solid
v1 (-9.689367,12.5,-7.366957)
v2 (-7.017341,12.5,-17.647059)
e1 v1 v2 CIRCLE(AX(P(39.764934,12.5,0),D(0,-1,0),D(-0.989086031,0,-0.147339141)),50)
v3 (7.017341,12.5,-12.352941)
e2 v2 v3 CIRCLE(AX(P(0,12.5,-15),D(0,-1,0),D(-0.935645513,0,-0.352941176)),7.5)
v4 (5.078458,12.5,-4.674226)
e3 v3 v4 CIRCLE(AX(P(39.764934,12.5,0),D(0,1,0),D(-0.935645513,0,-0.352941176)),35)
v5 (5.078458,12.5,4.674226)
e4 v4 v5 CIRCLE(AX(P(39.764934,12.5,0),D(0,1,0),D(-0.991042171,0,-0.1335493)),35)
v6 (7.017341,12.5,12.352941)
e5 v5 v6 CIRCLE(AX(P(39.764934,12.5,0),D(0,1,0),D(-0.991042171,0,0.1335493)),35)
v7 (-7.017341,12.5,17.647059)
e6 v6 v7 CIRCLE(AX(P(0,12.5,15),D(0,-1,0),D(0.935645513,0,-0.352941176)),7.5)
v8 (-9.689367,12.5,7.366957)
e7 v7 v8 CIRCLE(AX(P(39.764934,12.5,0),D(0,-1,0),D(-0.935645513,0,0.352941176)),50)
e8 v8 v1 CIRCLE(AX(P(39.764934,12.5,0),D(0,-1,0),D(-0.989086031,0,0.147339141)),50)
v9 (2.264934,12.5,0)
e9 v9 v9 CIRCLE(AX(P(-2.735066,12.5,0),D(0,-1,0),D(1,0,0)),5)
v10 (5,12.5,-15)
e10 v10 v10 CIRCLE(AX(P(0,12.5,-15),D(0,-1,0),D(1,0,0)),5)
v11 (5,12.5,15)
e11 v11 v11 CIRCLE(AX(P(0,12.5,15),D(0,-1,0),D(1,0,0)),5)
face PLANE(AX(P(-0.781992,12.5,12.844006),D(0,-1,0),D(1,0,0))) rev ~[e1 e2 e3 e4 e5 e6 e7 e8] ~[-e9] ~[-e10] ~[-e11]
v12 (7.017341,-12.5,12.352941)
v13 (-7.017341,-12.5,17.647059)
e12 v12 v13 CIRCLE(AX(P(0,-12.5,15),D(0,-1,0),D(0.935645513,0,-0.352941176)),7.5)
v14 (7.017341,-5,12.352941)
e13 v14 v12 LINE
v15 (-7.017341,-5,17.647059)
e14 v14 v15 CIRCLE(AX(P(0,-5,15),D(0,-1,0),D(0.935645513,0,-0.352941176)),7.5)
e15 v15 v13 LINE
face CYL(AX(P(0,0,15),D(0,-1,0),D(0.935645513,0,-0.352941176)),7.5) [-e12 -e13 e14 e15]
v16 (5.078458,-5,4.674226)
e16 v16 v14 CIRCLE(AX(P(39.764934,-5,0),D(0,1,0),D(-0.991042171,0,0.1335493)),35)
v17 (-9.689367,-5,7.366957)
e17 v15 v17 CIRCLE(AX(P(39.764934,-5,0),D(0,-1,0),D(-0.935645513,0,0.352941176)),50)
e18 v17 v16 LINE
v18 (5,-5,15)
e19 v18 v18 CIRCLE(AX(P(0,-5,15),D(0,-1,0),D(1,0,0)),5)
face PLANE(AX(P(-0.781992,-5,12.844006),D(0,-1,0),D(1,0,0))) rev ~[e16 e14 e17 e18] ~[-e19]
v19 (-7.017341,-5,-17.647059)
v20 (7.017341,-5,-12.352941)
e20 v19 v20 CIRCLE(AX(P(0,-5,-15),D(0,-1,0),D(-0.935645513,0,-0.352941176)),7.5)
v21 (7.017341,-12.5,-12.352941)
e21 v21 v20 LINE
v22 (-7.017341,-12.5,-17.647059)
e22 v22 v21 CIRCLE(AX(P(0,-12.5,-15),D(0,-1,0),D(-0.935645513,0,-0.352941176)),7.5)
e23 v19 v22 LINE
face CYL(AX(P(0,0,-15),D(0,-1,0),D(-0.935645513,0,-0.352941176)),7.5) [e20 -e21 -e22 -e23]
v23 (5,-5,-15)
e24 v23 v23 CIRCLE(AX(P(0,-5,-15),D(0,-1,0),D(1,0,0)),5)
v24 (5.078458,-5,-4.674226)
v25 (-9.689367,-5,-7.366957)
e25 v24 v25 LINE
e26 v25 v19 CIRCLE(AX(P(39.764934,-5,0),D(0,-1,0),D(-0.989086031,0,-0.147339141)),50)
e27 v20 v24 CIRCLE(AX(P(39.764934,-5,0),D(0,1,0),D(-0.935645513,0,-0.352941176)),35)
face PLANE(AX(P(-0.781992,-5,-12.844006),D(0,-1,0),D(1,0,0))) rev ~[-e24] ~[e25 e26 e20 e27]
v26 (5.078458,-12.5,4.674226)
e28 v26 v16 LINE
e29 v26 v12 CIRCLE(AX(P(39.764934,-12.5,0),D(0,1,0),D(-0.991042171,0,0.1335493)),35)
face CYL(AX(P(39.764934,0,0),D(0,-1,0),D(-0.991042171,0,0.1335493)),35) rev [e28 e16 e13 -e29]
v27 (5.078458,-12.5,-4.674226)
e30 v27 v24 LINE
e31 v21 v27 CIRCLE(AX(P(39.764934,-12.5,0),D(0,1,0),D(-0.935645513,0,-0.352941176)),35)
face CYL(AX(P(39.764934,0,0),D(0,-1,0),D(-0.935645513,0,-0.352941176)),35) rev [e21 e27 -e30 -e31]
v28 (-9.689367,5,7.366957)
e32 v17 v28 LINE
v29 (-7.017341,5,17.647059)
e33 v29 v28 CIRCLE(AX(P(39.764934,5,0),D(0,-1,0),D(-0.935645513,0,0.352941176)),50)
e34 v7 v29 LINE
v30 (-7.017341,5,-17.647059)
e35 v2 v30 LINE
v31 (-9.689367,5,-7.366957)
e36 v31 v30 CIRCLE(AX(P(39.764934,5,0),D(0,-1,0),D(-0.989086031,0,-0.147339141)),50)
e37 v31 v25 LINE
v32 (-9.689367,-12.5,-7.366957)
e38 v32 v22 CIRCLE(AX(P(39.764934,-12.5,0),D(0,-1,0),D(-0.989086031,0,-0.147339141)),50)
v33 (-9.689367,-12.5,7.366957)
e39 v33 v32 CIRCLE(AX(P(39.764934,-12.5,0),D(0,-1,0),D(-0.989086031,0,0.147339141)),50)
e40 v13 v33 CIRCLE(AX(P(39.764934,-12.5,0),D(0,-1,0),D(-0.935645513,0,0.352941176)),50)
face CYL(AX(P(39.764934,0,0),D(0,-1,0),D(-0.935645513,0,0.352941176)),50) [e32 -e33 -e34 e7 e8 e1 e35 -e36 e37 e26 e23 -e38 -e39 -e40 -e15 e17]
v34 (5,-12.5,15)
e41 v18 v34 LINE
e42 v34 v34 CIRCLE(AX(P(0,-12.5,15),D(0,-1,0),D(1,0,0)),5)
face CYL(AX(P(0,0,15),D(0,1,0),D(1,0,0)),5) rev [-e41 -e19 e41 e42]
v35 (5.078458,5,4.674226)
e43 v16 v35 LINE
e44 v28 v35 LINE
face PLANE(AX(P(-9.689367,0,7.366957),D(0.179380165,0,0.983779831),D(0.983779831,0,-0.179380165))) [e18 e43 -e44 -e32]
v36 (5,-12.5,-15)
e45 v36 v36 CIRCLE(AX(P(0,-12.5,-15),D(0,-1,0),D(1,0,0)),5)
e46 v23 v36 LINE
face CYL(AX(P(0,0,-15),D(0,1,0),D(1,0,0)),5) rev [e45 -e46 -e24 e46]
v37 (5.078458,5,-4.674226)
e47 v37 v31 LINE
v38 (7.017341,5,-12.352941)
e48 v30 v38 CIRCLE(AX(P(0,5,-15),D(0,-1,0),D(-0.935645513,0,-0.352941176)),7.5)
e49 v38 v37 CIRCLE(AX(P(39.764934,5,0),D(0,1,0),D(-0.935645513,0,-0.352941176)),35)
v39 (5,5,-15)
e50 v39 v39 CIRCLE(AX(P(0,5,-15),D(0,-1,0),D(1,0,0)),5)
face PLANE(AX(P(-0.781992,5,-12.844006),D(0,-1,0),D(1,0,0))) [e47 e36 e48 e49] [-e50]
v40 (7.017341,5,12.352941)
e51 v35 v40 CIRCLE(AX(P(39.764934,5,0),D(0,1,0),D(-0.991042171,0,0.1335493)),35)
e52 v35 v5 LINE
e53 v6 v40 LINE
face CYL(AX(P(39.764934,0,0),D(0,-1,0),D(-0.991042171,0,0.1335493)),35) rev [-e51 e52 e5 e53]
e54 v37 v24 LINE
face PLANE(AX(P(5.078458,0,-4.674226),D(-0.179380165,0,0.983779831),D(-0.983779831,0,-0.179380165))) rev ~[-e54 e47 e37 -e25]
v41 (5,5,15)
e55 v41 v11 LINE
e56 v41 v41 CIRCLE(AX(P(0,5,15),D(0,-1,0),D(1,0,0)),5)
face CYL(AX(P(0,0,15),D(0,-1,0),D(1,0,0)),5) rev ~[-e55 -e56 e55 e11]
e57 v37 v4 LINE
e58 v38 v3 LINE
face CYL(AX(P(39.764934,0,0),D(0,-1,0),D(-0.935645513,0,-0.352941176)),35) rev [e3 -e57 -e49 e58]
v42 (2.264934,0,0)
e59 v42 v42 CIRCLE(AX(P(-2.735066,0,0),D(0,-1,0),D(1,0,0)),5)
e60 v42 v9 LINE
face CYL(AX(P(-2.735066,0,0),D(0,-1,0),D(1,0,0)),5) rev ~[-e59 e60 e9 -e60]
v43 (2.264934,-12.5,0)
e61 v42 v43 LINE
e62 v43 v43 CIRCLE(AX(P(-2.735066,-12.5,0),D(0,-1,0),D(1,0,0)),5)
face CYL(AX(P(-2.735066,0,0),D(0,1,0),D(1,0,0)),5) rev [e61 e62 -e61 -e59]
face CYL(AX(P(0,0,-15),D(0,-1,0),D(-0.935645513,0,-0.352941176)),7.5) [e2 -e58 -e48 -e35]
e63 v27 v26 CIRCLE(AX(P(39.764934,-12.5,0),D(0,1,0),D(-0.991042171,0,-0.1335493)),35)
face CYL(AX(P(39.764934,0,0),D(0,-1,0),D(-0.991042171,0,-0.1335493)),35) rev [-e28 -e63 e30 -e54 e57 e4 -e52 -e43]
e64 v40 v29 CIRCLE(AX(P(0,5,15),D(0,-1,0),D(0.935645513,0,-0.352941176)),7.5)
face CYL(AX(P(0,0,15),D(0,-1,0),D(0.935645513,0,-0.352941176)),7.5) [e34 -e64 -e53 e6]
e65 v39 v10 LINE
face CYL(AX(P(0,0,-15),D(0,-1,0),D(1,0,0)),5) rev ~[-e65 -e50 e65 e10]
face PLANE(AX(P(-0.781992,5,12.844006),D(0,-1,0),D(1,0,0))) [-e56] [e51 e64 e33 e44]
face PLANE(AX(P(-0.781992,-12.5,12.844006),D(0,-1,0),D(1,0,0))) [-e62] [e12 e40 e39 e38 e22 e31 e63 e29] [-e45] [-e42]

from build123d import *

# Parameters (mm, degrees)
F0_R     = 5
F1_DEPTH = 12.5
F2_DEPTH = 5


# Not quite as in the source:
# - a feature of the source that left no trace in its solid (it failed there, or was rolled back) is left out


with BuildPart() as f1:
    # F0 (on Front) → F1 (new body, symmetric)
    with BuildSketch(Plane.XZ):
        with BuildLine():
            ThreePointArc((5.0784583206, 4.6742255002), (5.8300100803, 8.5686007088), (7.0173413473, 12.3529411765))
            ThreePointArc((7.0173413473, 12.3529411765), (2.6470588235, 22.0173413473), (-7.0173413473, 17.6470588235))
            ThreePointArc((-7.0173413473, 17.6470588235), (-8.6271086588, 12.5781627487), (-9.6893672694, 7.3669570477))
            Line((-9.6893672694, 7.3669570477), (5.0784583206, 4.6742255002))
        make_face()
        with Locations((0, 15)):
            Circle(F0_R, mode=Mode.SUBTRACT)
        with BuildLine():
            ThreePointArc((5.0784583206, -4.6742255002), (4.7649343015, 0), (5.0784583206, 4.6742255002))
            Line((5.0784583206, 4.6742255002), (-9.6893672694, 7.3669570477))
            ThreePointArc((-9.6893672694, 7.3669570477), (-10.2350656985, 0), (-9.6893672694, -7.3669570477))
            Line((-9.6893672694, -7.3669570477), (5.0784583206, -4.6742255002))
        make_face()
        with Locations((-2.7350656985, 0)):
            Circle(F0_R, mode=Mode.SUBTRACT)
        with BuildLine():
            ThreePointArc((7.0173413473, -12.3529411765), (5.8300100803, -8.5686007088), (5.0784583206, -4.6742255002))
            Line((5.0784583206, -4.6742255002), (-9.6893672694, -7.3669570477))
            ThreePointArc((-9.6893672694, -7.3669570477), (-8.6271086588, -12.5781627487), (-7.0173413473, -17.6470588235))
            ThreePointArc((-7.0173413473, -17.6470588235), (2.6470588235, -22.0173413473), (7.0173413473, -12.3529411765))
        make_face()
        with Locations((0, -15)):
            Circle(F0_R, mode=Mode.SUBTRACT)
    extrude(amount=F1_DEPTH, both=True)

    # F0 (on Front) → F2 (cut, symmetric)
    with BuildSketch(Plane.XZ):
        with BuildLine():
            ThreePointArc((5.0784583206, 4.6742255002), (5.8300100803, 8.5686007088), (7.0173413473, 12.3529411765))
            ThreePointArc((7.0173413473, 12.3529411765), (2.6470588235, 22.0173413473), (-7.0173413473, 17.6470588235))
            ThreePointArc((-7.0173413473, 17.6470588235), (-8.6271086588, 12.5781627487), (-9.6893672694, 7.3669570477))
            Line((-9.6893672694, 7.3669570477), (5.0784583206, 4.6742255002))
        make_face()
        with Locations((0, 15)):
            Circle(F0_R, mode=Mode.SUBTRACT)
        with BuildLine():
            ThreePointArc((7.0173413473, -12.3529411765), (5.8300100803, -8.5686007088), (5.0784583206, -4.6742255002))
            Line((5.0784583206, -4.6742255002), (-9.6893672694, -7.3669570477))
            ThreePointArc((-9.6893672694, -7.3669570477), (-8.6271086588, -12.5781627487), (-7.0173413473, -17.6470588235))
            ThreePointArc((-7.0173413473, -17.6470588235), (2.6470588235, -22.0173413473), (7.0173413473, -12.3529411765))
        make_face()
        with Locations((0, -15)):
            Circle(F0_R, mode=Mode.SUBTRACT)
    extrude(amount=F2_DEPTH, both=True, mode=Mode.SUBTRACT)


solid = f1.part
